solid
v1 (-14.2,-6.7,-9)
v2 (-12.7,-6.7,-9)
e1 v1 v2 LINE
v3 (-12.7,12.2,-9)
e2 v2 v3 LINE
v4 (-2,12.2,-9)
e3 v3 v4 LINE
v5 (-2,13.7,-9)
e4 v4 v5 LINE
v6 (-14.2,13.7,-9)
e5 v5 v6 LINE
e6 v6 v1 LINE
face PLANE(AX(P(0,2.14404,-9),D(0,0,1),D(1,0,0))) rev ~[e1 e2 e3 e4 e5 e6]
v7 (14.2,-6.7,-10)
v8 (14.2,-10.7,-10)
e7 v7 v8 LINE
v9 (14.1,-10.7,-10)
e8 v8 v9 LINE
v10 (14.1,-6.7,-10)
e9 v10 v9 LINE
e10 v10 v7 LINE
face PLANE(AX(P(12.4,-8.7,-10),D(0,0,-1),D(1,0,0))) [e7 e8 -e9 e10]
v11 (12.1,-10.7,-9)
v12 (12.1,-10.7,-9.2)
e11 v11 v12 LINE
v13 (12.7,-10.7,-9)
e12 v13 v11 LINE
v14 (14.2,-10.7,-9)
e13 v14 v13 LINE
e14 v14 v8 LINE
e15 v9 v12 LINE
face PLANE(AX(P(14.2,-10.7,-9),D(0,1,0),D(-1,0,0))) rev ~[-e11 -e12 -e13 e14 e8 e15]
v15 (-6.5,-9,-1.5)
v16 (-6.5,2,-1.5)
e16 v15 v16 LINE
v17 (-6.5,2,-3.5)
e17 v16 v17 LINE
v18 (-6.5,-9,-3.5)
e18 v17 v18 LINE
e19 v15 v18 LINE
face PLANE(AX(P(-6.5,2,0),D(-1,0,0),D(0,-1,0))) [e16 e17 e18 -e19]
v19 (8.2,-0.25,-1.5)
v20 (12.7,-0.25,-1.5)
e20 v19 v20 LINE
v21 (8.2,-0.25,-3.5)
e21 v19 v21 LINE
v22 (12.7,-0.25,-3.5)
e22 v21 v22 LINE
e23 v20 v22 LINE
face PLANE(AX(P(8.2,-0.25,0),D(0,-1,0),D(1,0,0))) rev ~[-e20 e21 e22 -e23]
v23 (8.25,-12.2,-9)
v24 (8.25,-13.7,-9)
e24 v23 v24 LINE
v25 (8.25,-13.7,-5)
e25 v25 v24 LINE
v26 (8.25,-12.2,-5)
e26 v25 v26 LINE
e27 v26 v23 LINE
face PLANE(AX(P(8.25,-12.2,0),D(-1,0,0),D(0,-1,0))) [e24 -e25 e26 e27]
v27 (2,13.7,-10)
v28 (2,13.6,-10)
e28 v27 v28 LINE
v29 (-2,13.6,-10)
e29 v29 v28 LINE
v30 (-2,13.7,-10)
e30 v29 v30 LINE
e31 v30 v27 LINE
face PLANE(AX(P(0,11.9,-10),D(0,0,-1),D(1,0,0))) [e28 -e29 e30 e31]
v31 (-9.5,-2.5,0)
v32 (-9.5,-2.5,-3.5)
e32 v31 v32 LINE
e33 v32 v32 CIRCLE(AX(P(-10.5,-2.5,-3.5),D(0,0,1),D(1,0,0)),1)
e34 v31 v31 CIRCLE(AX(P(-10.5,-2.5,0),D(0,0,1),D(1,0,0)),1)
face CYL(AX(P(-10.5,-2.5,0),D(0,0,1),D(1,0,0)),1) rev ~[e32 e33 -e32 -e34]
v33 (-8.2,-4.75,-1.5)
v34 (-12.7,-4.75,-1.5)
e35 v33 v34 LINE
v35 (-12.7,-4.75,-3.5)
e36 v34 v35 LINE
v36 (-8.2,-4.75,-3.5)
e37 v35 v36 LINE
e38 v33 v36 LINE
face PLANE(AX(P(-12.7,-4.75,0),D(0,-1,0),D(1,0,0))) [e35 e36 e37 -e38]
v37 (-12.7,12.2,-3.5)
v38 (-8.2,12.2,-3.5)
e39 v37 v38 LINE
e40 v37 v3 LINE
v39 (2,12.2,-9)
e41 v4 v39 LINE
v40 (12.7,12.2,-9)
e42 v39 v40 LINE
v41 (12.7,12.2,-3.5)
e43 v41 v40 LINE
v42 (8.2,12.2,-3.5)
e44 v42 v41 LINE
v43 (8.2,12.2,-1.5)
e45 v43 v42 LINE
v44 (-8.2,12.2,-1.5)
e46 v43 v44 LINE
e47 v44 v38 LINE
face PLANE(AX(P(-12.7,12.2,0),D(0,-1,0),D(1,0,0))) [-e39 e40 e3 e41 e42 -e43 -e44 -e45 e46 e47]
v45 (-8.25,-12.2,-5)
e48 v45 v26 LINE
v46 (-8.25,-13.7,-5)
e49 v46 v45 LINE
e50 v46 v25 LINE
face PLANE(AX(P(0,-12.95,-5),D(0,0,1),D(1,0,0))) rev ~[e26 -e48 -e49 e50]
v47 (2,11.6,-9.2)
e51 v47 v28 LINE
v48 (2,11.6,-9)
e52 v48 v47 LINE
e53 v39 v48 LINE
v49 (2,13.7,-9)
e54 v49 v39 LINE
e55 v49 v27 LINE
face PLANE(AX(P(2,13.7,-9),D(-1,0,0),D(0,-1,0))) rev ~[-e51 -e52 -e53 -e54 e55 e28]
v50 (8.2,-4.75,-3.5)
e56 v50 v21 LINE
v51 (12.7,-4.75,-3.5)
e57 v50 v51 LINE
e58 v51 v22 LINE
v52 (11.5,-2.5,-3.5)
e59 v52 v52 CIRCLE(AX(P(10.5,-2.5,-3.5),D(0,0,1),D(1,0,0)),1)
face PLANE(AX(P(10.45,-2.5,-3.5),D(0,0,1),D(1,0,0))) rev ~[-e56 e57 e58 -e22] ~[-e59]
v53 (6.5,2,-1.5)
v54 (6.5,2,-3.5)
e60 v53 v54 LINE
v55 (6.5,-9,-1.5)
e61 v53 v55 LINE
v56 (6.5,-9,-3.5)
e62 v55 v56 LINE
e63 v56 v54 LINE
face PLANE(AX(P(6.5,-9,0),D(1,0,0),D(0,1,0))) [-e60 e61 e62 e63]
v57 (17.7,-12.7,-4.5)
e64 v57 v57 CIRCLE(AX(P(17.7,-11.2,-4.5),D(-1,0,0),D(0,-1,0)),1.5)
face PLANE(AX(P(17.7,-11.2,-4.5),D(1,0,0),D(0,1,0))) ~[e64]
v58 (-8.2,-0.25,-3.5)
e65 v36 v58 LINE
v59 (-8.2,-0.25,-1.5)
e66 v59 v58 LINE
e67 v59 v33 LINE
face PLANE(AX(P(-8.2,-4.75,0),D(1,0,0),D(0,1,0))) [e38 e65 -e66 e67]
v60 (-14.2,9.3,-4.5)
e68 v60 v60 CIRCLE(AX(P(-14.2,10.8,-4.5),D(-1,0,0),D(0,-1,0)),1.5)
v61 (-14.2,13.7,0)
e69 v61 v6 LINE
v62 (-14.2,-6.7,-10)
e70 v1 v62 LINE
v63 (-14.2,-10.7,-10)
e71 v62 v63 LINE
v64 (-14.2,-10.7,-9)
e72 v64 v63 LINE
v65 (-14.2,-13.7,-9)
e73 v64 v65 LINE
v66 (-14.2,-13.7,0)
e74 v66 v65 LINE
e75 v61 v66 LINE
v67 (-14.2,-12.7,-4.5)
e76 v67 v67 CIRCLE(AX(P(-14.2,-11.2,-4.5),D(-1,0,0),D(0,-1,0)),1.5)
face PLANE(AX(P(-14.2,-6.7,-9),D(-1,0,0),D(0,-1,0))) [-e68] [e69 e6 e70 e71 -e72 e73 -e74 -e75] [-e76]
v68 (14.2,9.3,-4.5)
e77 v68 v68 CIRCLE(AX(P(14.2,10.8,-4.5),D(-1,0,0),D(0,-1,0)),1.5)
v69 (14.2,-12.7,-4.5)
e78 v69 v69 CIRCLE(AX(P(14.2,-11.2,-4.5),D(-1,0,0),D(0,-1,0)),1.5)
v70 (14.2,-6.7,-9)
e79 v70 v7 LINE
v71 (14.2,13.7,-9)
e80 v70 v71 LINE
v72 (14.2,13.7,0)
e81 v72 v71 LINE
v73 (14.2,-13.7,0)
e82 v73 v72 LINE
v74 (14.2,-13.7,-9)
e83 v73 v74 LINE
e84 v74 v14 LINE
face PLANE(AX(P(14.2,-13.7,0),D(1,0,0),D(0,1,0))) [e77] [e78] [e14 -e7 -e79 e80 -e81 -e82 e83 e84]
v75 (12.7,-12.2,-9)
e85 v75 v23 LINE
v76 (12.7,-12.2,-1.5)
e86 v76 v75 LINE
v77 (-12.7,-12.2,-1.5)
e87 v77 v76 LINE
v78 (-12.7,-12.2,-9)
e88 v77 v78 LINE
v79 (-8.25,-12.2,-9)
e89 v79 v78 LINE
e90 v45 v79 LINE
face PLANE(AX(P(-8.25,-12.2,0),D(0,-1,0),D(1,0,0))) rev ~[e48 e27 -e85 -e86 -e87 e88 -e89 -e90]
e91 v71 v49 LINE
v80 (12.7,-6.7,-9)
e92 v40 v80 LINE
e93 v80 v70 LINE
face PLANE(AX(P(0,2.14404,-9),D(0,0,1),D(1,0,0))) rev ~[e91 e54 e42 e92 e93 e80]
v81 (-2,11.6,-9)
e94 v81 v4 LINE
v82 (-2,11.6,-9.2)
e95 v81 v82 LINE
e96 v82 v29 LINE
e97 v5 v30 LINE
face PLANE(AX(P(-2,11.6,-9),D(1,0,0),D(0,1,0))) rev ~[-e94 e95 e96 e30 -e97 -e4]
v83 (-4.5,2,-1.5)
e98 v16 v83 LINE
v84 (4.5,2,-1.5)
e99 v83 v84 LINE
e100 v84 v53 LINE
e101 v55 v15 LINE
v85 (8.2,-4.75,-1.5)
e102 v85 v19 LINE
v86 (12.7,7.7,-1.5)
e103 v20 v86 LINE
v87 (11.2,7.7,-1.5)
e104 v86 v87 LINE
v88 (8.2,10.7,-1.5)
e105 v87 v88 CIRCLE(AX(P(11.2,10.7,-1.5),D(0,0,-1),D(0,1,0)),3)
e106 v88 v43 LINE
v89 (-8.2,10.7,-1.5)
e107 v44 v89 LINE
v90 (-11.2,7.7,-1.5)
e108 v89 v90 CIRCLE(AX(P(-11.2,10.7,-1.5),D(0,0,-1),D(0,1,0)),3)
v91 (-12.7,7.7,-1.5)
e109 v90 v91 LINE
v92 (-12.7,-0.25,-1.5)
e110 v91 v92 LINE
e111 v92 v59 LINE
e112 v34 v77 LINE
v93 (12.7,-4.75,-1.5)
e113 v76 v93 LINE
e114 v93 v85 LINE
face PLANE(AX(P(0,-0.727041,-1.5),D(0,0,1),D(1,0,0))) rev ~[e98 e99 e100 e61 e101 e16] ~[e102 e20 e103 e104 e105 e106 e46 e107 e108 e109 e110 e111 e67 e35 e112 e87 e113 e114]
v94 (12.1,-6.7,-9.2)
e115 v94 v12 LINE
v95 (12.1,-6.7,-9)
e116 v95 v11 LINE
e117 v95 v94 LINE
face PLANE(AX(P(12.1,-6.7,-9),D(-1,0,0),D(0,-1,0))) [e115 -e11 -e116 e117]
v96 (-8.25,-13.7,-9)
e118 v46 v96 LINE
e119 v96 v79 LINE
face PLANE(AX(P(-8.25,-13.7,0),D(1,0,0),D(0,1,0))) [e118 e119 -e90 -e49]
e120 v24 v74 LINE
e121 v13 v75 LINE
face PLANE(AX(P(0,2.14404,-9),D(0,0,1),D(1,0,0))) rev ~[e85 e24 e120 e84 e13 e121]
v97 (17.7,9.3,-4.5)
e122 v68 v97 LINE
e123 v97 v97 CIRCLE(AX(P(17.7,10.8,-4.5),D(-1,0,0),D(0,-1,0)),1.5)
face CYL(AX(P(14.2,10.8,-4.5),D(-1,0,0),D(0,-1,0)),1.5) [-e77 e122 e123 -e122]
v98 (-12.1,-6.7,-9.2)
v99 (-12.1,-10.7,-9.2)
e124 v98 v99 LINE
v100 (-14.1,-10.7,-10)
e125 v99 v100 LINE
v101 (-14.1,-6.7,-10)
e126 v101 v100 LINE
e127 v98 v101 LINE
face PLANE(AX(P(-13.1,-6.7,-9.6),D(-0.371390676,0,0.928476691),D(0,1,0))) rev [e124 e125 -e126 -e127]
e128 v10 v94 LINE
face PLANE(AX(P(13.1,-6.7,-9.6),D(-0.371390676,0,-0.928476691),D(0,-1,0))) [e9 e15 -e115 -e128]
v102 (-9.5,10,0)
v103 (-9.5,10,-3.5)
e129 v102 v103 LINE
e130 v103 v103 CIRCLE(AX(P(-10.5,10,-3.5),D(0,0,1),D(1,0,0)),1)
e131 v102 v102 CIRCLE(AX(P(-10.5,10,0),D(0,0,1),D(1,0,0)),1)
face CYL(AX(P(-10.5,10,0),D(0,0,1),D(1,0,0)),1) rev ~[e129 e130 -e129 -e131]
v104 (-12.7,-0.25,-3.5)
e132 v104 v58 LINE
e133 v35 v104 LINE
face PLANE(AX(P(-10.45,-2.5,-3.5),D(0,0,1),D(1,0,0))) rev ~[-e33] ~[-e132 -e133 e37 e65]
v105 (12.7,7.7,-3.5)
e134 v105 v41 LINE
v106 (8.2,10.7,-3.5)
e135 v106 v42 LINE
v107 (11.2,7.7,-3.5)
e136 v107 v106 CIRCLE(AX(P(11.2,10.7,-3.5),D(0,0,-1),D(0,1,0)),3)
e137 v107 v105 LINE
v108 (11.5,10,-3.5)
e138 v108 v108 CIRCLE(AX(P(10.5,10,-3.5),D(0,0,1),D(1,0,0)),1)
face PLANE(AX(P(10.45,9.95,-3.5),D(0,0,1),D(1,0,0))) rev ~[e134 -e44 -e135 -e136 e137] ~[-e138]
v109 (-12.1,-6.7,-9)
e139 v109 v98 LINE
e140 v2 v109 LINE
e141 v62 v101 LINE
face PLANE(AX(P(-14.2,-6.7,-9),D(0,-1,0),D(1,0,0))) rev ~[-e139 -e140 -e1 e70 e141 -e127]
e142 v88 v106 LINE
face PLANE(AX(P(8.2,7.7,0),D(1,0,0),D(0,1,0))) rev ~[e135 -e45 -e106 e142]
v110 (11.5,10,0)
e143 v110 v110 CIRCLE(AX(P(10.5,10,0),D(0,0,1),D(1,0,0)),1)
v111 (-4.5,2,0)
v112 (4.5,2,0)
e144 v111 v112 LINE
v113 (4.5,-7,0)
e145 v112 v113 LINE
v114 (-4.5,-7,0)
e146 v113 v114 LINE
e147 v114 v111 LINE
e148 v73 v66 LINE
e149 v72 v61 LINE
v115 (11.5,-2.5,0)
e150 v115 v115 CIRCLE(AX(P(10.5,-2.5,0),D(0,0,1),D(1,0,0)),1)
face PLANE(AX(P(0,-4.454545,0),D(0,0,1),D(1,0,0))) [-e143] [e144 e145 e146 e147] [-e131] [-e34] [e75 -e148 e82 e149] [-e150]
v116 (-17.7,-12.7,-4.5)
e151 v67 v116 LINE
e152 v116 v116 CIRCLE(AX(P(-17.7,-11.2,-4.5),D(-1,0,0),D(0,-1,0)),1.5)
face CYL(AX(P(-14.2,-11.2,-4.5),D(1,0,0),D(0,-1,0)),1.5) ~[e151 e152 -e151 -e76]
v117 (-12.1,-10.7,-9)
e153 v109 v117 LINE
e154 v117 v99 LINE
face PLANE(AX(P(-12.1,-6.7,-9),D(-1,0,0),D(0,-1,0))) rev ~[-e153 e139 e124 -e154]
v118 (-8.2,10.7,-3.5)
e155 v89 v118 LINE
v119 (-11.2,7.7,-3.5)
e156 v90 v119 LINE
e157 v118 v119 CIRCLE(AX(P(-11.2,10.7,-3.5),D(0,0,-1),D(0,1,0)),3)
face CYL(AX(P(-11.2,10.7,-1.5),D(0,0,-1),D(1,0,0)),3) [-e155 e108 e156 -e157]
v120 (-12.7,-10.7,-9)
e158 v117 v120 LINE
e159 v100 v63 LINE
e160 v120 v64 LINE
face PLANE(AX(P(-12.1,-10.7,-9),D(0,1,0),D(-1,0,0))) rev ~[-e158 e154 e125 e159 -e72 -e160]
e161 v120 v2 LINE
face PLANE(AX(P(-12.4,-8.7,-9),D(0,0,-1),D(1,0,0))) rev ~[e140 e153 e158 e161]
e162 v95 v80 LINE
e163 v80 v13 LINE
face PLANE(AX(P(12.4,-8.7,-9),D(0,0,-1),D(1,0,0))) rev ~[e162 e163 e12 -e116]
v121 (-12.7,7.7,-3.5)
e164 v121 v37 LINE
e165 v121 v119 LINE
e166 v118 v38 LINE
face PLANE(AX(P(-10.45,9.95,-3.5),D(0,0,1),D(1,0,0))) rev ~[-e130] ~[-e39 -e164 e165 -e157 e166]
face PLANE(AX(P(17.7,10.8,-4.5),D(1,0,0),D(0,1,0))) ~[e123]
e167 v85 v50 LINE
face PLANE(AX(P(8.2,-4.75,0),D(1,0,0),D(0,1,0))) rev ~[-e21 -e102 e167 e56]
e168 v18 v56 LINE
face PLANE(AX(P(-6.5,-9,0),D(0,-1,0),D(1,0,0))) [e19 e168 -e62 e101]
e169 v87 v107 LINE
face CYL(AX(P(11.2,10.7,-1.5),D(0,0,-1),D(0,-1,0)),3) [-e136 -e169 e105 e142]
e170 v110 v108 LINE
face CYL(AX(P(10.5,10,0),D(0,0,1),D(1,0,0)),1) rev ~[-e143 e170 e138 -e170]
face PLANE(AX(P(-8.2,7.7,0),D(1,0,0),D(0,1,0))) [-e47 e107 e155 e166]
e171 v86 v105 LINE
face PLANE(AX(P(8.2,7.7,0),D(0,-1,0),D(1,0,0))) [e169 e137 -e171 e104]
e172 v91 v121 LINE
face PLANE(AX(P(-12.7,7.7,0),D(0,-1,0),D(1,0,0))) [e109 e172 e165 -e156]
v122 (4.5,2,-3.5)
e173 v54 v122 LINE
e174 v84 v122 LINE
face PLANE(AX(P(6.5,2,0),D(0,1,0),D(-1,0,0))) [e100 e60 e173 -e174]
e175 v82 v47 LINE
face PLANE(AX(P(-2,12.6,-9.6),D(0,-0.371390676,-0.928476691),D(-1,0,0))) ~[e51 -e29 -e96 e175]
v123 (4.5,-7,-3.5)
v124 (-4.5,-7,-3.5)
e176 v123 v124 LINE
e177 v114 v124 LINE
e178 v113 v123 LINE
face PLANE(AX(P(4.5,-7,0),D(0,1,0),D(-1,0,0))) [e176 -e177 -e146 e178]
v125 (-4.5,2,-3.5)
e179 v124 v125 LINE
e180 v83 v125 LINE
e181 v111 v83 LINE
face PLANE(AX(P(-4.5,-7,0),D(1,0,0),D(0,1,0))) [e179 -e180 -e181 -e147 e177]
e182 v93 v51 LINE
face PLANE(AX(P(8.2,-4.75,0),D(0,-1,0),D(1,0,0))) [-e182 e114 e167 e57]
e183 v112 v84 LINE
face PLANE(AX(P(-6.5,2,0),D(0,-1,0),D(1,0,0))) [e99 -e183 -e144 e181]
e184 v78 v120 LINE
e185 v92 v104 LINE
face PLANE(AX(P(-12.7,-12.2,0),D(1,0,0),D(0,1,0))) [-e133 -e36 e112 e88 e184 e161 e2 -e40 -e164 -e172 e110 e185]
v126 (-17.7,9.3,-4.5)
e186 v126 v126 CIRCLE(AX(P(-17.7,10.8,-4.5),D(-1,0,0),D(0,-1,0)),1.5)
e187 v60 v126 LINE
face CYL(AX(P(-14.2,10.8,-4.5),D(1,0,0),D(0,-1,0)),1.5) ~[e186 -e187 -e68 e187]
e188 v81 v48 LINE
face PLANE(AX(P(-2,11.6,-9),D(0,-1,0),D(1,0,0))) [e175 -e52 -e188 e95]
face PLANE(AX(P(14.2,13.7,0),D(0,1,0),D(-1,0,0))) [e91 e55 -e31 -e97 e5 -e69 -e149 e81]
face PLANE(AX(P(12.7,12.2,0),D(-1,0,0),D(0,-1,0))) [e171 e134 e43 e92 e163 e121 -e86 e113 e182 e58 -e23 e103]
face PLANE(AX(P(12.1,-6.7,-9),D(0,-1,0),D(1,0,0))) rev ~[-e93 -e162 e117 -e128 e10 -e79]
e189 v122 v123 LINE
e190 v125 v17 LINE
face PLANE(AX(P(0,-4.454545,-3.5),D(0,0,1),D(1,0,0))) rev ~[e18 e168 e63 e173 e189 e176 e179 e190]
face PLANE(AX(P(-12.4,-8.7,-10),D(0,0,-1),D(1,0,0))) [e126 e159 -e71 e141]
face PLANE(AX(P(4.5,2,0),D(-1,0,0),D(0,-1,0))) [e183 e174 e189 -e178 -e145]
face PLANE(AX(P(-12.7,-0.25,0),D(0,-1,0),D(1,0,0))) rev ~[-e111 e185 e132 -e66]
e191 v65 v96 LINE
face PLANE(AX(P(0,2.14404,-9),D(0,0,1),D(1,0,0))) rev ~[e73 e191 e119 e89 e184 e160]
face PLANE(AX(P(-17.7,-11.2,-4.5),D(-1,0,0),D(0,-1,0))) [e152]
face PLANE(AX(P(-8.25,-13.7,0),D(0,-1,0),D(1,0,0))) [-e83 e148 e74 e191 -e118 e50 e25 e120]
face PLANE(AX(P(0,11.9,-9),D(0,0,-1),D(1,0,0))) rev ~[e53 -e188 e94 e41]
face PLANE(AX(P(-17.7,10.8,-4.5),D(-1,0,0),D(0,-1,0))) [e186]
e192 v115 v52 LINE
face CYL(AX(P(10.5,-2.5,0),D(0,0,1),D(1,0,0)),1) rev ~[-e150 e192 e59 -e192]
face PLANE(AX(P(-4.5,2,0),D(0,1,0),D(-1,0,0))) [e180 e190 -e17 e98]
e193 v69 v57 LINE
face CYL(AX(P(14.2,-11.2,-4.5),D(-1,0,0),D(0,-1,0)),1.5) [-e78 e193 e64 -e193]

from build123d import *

# Parameters (mm, degrees)
F1_DEPTH    = 1.5
F2_DEPTH    = 9
F0_W        = 4.5
F0_H        = 4.5
F0_R        = 1
F3_DEPTH    = 3.5
F0_W_2      = 16.5
F0_H_2      = 1.5
F4_DEPTH    = 5
F5_R        = 1.5
F6_DEPTH    = 3.5
F8_R        = 3
F9_W        = 0.6
F9_H        = 4
F9_W_2      = 1.5
F9_W_3      = 4
F9_H_2      = 0.6
F9_H_3      = 1.5
F10_DEPTH   = 1
F11_SIZE2   = 2
F11_SIZE    = 0.8
F11_2_SIZE2 = 2
F11_2_SIZE  = 0.8
F12_SIZE2   = 0.8
F12_SIZE    = 2


# Not quite as in the source:
# - a feature names something its author has since deleted; it is built from what else it names


with BuildPart() as f1:
    # F0 (on Top) → F1 (new body)
    with BuildSketch(Plane.XY):
        Polygon((8.2, 12.2), (-8.2, 12.2), (-8.2, 7.7), (-12.7, 7.7), (-12.7, -0.25), (-8.2, -0.25), (-8.2, -4.75), (-12.7, -4.75), (-12.7, -12.2), (-8.25, -12.2), (8.25, -12.2), (12.7, -12.2), (12.7, -4.75), (8.2, -4.75), (8.2, -0.25), (12.7, -0.25), (12.7, 7.7), (8.2, 7.7), align=None)
        Polygon((-6.5, 2), (-4.5, 2), (4.5, 2), (6.5, 2), (6.5, -9), (-6.5, -9), align=None, mode=Mode.SUBTRACT)
    extrude(amount=-F1_DEPTH)



with BuildPart() as f2:
    # F0 (on Top) → F2 (new body)
    with BuildSketch(Plane.XY):
        Polygon((-12.7, 7.7), (-12.7, 12.2), (-8.2, 12.2), (8.2, 12.2), (12.7, 12.2), (12.7, 7.7), (12.7, -0.25), (12.7, -4.75), (12.7, -12.2), (8.25, -12.2), (8.25, -13.7), (14.2, -13.7), (14.2, 13.7), (-14.2, 13.7), (-14.2, -13.7), (-8.25, -13.7), (-8.25, -12.2), (-12.7, -12.2), (-12.7, -4.75), (-12.7, -0.25), align=None)
    extrude(amount=-F2_DEPTH)


with BuildPart() as f3:
    # F0 (on Top) → F3 (new body)
    with BuildSketch(Plane.XY):
        with Locations((10.45, 9.95)):
            Rectangle(F0_W, F0_H)
        with Locations((10.5, 10)):
            Circle(F0_R, mode=Mode.SUBTRACT)
    extrude(amount=-F3_DEPTH)


with BuildPart() as f3b:
    # F0 (on Top) → F3, piece 2 (new body)
    with BuildSketch(Plane.XY):
        with Locations((10.45, -2.5)):
            Rectangle(F0_W, F0_H)
        with Locations((10.5, -2.5)):
            Circle(F0_R, mode=Mode.SUBTRACT)
    extrude(amount=-F3_DEPTH)


with BuildPart() as f3c:
    # F0 (on Top) → F3, piece 3 (new body)
    with BuildSketch(Plane.XY):
        Polygon((-4.5, -7), (-4.5, 2), (-6.5, 2), (-6.5, -9), (6.5, -9), (6.5, 2), (4.5, 2), (4.5, -7), align=None)
    extrude(amount=-F3_DEPTH)


with BuildPart() as f3d:
    # F0 (on Top) → F3, piece 4 (new body)
    with BuildSketch(Plane.XY):
        with Locations((-10.45, 9.95)):
            Rectangle(F0_W, F0_H)
        with Locations((-10.5, 10)):
            Circle(F0_R, mode=Mode.SUBTRACT)
    extrude(amount=-F3_DEPTH)


with BuildPart() as f3e:
    # F0 (on Top) → F3, piece 5 (new body)
    with BuildSketch(Plane.XY):
        with Locations((-10.45, -2.5)):
            Rectangle(F0_W, F0_H)
        with Locations((-10.5, -2.5)):
            Circle(F0_R, mode=Mode.SUBTRACT)
    extrude(amount=-F3_DEPTH)


with BuildPart() as f1_1:
    add(f1.part)

    add(f2.part)  # F4 merges F2
    # F0 (on Top) → F4 (join)
    with BuildSketch(Plane.XY):
        with Locations((0, -12.95)):
            Rectangle(F0_W_2, F0_H_2)
    extrude(amount=-F4_DEPTH)

    # F5 (on face) → F6 (join)
    with BuildSketch(Plane(origin=(-14.2, 0, 0), x_dir=(0, -1, 0), z_dir=(-1, 0, 0))):
        with Locations((11.2, -4.5)):
            Circle(F5_R)
        with Locations((-10.8, -4.5)):
            Circle(F5_R)
    extrude(amount=F6_DEPTH)



with BuildPart() as f1_2:
    add(f1_1.part)

    add(f3.part)  # F7 merges F3

    add(f3b.part)  # F7 merges F3b

    add(f3c.part)  # F7 merges F3c

    add(f3d.part)  # F7 merges F3d

    add(f3e.part)  # F7 merges F3e
    # F7: F1 across plane
    add(f1_1.part.mirror(Plane.YZ))

    # F8
    f8_edges = [f1_2.edges().sort_by_distance(p)[0] for p in [
        (8.2, 7.7, -2.5),
        (-8.2, 7.7, -2.5),
    ]]
    fillet(f8_edges, radius=F8_R)

    # F9 (on face) → F10 (join)
    with BuildSketch(Plane(origin=(0, 0, -9), x_dir=(1, 0, 0), z_dir=(0, 0, -1))):
        with Locations((-12.4, 8.7)):
            Rectangle(F9_W, F9_H)
        with Locations((-13.45, 8.7)):
            Rectangle(F9_W_2, F9_H)
        with Locations((12.4, 8.7)):
            Rectangle(F9_W, F9_H)
        with Locations((13.45, 8.7)):
            Rectangle(F9_W_2, F9_H)
        with Locations((0, -11.9)):
            Rectangle(F9_W_3, F9_H_2)
        with Locations((0, -12.95)):
            Rectangle(F9_W_3, F9_H_3)
    extrude(amount=F10_DEPTH)

    # F11
    f11_edges = [f1_2.edges().sort_by_distance(p)[0] for p in [
        (-12.1, -8.7, -10),
    ]]
    f11_side = f1_2.faces().sort_by_distance((-12.1, -8.7, -9.5))[0]
    chamfer(f11_edges, length=F11_SIZE, length2=F11_SIZE2, reference=f11_side)

    # F11#2
    f11_2_edges = [f1_2.edges().sort_by_distance(p)[0] for p in [
        (0, 11.6, -10),
    ]]
    f11_2_side = f1_2.faces().sort_by_distance((0, 11.6, -9.5))[0]
    chamfer(f11_2_edges, length=F11_2_SIZE, length2=F11_2_SIZE2, reference=f11_2_side)

    # F12
    f12_edges = [f1_2.edges().sort_by_distance(p)[0] for p in [
        (12.1, -8.7, -10),
    ]]
    f12_side = f1_2.faces().sort_by_distance((13.15, -8.7, -10))[0]
    chamfer(f12_edges, length=F12_SIZE, length2=F12_SIZE2, reference=f12_side)


solid = f1_2.part
